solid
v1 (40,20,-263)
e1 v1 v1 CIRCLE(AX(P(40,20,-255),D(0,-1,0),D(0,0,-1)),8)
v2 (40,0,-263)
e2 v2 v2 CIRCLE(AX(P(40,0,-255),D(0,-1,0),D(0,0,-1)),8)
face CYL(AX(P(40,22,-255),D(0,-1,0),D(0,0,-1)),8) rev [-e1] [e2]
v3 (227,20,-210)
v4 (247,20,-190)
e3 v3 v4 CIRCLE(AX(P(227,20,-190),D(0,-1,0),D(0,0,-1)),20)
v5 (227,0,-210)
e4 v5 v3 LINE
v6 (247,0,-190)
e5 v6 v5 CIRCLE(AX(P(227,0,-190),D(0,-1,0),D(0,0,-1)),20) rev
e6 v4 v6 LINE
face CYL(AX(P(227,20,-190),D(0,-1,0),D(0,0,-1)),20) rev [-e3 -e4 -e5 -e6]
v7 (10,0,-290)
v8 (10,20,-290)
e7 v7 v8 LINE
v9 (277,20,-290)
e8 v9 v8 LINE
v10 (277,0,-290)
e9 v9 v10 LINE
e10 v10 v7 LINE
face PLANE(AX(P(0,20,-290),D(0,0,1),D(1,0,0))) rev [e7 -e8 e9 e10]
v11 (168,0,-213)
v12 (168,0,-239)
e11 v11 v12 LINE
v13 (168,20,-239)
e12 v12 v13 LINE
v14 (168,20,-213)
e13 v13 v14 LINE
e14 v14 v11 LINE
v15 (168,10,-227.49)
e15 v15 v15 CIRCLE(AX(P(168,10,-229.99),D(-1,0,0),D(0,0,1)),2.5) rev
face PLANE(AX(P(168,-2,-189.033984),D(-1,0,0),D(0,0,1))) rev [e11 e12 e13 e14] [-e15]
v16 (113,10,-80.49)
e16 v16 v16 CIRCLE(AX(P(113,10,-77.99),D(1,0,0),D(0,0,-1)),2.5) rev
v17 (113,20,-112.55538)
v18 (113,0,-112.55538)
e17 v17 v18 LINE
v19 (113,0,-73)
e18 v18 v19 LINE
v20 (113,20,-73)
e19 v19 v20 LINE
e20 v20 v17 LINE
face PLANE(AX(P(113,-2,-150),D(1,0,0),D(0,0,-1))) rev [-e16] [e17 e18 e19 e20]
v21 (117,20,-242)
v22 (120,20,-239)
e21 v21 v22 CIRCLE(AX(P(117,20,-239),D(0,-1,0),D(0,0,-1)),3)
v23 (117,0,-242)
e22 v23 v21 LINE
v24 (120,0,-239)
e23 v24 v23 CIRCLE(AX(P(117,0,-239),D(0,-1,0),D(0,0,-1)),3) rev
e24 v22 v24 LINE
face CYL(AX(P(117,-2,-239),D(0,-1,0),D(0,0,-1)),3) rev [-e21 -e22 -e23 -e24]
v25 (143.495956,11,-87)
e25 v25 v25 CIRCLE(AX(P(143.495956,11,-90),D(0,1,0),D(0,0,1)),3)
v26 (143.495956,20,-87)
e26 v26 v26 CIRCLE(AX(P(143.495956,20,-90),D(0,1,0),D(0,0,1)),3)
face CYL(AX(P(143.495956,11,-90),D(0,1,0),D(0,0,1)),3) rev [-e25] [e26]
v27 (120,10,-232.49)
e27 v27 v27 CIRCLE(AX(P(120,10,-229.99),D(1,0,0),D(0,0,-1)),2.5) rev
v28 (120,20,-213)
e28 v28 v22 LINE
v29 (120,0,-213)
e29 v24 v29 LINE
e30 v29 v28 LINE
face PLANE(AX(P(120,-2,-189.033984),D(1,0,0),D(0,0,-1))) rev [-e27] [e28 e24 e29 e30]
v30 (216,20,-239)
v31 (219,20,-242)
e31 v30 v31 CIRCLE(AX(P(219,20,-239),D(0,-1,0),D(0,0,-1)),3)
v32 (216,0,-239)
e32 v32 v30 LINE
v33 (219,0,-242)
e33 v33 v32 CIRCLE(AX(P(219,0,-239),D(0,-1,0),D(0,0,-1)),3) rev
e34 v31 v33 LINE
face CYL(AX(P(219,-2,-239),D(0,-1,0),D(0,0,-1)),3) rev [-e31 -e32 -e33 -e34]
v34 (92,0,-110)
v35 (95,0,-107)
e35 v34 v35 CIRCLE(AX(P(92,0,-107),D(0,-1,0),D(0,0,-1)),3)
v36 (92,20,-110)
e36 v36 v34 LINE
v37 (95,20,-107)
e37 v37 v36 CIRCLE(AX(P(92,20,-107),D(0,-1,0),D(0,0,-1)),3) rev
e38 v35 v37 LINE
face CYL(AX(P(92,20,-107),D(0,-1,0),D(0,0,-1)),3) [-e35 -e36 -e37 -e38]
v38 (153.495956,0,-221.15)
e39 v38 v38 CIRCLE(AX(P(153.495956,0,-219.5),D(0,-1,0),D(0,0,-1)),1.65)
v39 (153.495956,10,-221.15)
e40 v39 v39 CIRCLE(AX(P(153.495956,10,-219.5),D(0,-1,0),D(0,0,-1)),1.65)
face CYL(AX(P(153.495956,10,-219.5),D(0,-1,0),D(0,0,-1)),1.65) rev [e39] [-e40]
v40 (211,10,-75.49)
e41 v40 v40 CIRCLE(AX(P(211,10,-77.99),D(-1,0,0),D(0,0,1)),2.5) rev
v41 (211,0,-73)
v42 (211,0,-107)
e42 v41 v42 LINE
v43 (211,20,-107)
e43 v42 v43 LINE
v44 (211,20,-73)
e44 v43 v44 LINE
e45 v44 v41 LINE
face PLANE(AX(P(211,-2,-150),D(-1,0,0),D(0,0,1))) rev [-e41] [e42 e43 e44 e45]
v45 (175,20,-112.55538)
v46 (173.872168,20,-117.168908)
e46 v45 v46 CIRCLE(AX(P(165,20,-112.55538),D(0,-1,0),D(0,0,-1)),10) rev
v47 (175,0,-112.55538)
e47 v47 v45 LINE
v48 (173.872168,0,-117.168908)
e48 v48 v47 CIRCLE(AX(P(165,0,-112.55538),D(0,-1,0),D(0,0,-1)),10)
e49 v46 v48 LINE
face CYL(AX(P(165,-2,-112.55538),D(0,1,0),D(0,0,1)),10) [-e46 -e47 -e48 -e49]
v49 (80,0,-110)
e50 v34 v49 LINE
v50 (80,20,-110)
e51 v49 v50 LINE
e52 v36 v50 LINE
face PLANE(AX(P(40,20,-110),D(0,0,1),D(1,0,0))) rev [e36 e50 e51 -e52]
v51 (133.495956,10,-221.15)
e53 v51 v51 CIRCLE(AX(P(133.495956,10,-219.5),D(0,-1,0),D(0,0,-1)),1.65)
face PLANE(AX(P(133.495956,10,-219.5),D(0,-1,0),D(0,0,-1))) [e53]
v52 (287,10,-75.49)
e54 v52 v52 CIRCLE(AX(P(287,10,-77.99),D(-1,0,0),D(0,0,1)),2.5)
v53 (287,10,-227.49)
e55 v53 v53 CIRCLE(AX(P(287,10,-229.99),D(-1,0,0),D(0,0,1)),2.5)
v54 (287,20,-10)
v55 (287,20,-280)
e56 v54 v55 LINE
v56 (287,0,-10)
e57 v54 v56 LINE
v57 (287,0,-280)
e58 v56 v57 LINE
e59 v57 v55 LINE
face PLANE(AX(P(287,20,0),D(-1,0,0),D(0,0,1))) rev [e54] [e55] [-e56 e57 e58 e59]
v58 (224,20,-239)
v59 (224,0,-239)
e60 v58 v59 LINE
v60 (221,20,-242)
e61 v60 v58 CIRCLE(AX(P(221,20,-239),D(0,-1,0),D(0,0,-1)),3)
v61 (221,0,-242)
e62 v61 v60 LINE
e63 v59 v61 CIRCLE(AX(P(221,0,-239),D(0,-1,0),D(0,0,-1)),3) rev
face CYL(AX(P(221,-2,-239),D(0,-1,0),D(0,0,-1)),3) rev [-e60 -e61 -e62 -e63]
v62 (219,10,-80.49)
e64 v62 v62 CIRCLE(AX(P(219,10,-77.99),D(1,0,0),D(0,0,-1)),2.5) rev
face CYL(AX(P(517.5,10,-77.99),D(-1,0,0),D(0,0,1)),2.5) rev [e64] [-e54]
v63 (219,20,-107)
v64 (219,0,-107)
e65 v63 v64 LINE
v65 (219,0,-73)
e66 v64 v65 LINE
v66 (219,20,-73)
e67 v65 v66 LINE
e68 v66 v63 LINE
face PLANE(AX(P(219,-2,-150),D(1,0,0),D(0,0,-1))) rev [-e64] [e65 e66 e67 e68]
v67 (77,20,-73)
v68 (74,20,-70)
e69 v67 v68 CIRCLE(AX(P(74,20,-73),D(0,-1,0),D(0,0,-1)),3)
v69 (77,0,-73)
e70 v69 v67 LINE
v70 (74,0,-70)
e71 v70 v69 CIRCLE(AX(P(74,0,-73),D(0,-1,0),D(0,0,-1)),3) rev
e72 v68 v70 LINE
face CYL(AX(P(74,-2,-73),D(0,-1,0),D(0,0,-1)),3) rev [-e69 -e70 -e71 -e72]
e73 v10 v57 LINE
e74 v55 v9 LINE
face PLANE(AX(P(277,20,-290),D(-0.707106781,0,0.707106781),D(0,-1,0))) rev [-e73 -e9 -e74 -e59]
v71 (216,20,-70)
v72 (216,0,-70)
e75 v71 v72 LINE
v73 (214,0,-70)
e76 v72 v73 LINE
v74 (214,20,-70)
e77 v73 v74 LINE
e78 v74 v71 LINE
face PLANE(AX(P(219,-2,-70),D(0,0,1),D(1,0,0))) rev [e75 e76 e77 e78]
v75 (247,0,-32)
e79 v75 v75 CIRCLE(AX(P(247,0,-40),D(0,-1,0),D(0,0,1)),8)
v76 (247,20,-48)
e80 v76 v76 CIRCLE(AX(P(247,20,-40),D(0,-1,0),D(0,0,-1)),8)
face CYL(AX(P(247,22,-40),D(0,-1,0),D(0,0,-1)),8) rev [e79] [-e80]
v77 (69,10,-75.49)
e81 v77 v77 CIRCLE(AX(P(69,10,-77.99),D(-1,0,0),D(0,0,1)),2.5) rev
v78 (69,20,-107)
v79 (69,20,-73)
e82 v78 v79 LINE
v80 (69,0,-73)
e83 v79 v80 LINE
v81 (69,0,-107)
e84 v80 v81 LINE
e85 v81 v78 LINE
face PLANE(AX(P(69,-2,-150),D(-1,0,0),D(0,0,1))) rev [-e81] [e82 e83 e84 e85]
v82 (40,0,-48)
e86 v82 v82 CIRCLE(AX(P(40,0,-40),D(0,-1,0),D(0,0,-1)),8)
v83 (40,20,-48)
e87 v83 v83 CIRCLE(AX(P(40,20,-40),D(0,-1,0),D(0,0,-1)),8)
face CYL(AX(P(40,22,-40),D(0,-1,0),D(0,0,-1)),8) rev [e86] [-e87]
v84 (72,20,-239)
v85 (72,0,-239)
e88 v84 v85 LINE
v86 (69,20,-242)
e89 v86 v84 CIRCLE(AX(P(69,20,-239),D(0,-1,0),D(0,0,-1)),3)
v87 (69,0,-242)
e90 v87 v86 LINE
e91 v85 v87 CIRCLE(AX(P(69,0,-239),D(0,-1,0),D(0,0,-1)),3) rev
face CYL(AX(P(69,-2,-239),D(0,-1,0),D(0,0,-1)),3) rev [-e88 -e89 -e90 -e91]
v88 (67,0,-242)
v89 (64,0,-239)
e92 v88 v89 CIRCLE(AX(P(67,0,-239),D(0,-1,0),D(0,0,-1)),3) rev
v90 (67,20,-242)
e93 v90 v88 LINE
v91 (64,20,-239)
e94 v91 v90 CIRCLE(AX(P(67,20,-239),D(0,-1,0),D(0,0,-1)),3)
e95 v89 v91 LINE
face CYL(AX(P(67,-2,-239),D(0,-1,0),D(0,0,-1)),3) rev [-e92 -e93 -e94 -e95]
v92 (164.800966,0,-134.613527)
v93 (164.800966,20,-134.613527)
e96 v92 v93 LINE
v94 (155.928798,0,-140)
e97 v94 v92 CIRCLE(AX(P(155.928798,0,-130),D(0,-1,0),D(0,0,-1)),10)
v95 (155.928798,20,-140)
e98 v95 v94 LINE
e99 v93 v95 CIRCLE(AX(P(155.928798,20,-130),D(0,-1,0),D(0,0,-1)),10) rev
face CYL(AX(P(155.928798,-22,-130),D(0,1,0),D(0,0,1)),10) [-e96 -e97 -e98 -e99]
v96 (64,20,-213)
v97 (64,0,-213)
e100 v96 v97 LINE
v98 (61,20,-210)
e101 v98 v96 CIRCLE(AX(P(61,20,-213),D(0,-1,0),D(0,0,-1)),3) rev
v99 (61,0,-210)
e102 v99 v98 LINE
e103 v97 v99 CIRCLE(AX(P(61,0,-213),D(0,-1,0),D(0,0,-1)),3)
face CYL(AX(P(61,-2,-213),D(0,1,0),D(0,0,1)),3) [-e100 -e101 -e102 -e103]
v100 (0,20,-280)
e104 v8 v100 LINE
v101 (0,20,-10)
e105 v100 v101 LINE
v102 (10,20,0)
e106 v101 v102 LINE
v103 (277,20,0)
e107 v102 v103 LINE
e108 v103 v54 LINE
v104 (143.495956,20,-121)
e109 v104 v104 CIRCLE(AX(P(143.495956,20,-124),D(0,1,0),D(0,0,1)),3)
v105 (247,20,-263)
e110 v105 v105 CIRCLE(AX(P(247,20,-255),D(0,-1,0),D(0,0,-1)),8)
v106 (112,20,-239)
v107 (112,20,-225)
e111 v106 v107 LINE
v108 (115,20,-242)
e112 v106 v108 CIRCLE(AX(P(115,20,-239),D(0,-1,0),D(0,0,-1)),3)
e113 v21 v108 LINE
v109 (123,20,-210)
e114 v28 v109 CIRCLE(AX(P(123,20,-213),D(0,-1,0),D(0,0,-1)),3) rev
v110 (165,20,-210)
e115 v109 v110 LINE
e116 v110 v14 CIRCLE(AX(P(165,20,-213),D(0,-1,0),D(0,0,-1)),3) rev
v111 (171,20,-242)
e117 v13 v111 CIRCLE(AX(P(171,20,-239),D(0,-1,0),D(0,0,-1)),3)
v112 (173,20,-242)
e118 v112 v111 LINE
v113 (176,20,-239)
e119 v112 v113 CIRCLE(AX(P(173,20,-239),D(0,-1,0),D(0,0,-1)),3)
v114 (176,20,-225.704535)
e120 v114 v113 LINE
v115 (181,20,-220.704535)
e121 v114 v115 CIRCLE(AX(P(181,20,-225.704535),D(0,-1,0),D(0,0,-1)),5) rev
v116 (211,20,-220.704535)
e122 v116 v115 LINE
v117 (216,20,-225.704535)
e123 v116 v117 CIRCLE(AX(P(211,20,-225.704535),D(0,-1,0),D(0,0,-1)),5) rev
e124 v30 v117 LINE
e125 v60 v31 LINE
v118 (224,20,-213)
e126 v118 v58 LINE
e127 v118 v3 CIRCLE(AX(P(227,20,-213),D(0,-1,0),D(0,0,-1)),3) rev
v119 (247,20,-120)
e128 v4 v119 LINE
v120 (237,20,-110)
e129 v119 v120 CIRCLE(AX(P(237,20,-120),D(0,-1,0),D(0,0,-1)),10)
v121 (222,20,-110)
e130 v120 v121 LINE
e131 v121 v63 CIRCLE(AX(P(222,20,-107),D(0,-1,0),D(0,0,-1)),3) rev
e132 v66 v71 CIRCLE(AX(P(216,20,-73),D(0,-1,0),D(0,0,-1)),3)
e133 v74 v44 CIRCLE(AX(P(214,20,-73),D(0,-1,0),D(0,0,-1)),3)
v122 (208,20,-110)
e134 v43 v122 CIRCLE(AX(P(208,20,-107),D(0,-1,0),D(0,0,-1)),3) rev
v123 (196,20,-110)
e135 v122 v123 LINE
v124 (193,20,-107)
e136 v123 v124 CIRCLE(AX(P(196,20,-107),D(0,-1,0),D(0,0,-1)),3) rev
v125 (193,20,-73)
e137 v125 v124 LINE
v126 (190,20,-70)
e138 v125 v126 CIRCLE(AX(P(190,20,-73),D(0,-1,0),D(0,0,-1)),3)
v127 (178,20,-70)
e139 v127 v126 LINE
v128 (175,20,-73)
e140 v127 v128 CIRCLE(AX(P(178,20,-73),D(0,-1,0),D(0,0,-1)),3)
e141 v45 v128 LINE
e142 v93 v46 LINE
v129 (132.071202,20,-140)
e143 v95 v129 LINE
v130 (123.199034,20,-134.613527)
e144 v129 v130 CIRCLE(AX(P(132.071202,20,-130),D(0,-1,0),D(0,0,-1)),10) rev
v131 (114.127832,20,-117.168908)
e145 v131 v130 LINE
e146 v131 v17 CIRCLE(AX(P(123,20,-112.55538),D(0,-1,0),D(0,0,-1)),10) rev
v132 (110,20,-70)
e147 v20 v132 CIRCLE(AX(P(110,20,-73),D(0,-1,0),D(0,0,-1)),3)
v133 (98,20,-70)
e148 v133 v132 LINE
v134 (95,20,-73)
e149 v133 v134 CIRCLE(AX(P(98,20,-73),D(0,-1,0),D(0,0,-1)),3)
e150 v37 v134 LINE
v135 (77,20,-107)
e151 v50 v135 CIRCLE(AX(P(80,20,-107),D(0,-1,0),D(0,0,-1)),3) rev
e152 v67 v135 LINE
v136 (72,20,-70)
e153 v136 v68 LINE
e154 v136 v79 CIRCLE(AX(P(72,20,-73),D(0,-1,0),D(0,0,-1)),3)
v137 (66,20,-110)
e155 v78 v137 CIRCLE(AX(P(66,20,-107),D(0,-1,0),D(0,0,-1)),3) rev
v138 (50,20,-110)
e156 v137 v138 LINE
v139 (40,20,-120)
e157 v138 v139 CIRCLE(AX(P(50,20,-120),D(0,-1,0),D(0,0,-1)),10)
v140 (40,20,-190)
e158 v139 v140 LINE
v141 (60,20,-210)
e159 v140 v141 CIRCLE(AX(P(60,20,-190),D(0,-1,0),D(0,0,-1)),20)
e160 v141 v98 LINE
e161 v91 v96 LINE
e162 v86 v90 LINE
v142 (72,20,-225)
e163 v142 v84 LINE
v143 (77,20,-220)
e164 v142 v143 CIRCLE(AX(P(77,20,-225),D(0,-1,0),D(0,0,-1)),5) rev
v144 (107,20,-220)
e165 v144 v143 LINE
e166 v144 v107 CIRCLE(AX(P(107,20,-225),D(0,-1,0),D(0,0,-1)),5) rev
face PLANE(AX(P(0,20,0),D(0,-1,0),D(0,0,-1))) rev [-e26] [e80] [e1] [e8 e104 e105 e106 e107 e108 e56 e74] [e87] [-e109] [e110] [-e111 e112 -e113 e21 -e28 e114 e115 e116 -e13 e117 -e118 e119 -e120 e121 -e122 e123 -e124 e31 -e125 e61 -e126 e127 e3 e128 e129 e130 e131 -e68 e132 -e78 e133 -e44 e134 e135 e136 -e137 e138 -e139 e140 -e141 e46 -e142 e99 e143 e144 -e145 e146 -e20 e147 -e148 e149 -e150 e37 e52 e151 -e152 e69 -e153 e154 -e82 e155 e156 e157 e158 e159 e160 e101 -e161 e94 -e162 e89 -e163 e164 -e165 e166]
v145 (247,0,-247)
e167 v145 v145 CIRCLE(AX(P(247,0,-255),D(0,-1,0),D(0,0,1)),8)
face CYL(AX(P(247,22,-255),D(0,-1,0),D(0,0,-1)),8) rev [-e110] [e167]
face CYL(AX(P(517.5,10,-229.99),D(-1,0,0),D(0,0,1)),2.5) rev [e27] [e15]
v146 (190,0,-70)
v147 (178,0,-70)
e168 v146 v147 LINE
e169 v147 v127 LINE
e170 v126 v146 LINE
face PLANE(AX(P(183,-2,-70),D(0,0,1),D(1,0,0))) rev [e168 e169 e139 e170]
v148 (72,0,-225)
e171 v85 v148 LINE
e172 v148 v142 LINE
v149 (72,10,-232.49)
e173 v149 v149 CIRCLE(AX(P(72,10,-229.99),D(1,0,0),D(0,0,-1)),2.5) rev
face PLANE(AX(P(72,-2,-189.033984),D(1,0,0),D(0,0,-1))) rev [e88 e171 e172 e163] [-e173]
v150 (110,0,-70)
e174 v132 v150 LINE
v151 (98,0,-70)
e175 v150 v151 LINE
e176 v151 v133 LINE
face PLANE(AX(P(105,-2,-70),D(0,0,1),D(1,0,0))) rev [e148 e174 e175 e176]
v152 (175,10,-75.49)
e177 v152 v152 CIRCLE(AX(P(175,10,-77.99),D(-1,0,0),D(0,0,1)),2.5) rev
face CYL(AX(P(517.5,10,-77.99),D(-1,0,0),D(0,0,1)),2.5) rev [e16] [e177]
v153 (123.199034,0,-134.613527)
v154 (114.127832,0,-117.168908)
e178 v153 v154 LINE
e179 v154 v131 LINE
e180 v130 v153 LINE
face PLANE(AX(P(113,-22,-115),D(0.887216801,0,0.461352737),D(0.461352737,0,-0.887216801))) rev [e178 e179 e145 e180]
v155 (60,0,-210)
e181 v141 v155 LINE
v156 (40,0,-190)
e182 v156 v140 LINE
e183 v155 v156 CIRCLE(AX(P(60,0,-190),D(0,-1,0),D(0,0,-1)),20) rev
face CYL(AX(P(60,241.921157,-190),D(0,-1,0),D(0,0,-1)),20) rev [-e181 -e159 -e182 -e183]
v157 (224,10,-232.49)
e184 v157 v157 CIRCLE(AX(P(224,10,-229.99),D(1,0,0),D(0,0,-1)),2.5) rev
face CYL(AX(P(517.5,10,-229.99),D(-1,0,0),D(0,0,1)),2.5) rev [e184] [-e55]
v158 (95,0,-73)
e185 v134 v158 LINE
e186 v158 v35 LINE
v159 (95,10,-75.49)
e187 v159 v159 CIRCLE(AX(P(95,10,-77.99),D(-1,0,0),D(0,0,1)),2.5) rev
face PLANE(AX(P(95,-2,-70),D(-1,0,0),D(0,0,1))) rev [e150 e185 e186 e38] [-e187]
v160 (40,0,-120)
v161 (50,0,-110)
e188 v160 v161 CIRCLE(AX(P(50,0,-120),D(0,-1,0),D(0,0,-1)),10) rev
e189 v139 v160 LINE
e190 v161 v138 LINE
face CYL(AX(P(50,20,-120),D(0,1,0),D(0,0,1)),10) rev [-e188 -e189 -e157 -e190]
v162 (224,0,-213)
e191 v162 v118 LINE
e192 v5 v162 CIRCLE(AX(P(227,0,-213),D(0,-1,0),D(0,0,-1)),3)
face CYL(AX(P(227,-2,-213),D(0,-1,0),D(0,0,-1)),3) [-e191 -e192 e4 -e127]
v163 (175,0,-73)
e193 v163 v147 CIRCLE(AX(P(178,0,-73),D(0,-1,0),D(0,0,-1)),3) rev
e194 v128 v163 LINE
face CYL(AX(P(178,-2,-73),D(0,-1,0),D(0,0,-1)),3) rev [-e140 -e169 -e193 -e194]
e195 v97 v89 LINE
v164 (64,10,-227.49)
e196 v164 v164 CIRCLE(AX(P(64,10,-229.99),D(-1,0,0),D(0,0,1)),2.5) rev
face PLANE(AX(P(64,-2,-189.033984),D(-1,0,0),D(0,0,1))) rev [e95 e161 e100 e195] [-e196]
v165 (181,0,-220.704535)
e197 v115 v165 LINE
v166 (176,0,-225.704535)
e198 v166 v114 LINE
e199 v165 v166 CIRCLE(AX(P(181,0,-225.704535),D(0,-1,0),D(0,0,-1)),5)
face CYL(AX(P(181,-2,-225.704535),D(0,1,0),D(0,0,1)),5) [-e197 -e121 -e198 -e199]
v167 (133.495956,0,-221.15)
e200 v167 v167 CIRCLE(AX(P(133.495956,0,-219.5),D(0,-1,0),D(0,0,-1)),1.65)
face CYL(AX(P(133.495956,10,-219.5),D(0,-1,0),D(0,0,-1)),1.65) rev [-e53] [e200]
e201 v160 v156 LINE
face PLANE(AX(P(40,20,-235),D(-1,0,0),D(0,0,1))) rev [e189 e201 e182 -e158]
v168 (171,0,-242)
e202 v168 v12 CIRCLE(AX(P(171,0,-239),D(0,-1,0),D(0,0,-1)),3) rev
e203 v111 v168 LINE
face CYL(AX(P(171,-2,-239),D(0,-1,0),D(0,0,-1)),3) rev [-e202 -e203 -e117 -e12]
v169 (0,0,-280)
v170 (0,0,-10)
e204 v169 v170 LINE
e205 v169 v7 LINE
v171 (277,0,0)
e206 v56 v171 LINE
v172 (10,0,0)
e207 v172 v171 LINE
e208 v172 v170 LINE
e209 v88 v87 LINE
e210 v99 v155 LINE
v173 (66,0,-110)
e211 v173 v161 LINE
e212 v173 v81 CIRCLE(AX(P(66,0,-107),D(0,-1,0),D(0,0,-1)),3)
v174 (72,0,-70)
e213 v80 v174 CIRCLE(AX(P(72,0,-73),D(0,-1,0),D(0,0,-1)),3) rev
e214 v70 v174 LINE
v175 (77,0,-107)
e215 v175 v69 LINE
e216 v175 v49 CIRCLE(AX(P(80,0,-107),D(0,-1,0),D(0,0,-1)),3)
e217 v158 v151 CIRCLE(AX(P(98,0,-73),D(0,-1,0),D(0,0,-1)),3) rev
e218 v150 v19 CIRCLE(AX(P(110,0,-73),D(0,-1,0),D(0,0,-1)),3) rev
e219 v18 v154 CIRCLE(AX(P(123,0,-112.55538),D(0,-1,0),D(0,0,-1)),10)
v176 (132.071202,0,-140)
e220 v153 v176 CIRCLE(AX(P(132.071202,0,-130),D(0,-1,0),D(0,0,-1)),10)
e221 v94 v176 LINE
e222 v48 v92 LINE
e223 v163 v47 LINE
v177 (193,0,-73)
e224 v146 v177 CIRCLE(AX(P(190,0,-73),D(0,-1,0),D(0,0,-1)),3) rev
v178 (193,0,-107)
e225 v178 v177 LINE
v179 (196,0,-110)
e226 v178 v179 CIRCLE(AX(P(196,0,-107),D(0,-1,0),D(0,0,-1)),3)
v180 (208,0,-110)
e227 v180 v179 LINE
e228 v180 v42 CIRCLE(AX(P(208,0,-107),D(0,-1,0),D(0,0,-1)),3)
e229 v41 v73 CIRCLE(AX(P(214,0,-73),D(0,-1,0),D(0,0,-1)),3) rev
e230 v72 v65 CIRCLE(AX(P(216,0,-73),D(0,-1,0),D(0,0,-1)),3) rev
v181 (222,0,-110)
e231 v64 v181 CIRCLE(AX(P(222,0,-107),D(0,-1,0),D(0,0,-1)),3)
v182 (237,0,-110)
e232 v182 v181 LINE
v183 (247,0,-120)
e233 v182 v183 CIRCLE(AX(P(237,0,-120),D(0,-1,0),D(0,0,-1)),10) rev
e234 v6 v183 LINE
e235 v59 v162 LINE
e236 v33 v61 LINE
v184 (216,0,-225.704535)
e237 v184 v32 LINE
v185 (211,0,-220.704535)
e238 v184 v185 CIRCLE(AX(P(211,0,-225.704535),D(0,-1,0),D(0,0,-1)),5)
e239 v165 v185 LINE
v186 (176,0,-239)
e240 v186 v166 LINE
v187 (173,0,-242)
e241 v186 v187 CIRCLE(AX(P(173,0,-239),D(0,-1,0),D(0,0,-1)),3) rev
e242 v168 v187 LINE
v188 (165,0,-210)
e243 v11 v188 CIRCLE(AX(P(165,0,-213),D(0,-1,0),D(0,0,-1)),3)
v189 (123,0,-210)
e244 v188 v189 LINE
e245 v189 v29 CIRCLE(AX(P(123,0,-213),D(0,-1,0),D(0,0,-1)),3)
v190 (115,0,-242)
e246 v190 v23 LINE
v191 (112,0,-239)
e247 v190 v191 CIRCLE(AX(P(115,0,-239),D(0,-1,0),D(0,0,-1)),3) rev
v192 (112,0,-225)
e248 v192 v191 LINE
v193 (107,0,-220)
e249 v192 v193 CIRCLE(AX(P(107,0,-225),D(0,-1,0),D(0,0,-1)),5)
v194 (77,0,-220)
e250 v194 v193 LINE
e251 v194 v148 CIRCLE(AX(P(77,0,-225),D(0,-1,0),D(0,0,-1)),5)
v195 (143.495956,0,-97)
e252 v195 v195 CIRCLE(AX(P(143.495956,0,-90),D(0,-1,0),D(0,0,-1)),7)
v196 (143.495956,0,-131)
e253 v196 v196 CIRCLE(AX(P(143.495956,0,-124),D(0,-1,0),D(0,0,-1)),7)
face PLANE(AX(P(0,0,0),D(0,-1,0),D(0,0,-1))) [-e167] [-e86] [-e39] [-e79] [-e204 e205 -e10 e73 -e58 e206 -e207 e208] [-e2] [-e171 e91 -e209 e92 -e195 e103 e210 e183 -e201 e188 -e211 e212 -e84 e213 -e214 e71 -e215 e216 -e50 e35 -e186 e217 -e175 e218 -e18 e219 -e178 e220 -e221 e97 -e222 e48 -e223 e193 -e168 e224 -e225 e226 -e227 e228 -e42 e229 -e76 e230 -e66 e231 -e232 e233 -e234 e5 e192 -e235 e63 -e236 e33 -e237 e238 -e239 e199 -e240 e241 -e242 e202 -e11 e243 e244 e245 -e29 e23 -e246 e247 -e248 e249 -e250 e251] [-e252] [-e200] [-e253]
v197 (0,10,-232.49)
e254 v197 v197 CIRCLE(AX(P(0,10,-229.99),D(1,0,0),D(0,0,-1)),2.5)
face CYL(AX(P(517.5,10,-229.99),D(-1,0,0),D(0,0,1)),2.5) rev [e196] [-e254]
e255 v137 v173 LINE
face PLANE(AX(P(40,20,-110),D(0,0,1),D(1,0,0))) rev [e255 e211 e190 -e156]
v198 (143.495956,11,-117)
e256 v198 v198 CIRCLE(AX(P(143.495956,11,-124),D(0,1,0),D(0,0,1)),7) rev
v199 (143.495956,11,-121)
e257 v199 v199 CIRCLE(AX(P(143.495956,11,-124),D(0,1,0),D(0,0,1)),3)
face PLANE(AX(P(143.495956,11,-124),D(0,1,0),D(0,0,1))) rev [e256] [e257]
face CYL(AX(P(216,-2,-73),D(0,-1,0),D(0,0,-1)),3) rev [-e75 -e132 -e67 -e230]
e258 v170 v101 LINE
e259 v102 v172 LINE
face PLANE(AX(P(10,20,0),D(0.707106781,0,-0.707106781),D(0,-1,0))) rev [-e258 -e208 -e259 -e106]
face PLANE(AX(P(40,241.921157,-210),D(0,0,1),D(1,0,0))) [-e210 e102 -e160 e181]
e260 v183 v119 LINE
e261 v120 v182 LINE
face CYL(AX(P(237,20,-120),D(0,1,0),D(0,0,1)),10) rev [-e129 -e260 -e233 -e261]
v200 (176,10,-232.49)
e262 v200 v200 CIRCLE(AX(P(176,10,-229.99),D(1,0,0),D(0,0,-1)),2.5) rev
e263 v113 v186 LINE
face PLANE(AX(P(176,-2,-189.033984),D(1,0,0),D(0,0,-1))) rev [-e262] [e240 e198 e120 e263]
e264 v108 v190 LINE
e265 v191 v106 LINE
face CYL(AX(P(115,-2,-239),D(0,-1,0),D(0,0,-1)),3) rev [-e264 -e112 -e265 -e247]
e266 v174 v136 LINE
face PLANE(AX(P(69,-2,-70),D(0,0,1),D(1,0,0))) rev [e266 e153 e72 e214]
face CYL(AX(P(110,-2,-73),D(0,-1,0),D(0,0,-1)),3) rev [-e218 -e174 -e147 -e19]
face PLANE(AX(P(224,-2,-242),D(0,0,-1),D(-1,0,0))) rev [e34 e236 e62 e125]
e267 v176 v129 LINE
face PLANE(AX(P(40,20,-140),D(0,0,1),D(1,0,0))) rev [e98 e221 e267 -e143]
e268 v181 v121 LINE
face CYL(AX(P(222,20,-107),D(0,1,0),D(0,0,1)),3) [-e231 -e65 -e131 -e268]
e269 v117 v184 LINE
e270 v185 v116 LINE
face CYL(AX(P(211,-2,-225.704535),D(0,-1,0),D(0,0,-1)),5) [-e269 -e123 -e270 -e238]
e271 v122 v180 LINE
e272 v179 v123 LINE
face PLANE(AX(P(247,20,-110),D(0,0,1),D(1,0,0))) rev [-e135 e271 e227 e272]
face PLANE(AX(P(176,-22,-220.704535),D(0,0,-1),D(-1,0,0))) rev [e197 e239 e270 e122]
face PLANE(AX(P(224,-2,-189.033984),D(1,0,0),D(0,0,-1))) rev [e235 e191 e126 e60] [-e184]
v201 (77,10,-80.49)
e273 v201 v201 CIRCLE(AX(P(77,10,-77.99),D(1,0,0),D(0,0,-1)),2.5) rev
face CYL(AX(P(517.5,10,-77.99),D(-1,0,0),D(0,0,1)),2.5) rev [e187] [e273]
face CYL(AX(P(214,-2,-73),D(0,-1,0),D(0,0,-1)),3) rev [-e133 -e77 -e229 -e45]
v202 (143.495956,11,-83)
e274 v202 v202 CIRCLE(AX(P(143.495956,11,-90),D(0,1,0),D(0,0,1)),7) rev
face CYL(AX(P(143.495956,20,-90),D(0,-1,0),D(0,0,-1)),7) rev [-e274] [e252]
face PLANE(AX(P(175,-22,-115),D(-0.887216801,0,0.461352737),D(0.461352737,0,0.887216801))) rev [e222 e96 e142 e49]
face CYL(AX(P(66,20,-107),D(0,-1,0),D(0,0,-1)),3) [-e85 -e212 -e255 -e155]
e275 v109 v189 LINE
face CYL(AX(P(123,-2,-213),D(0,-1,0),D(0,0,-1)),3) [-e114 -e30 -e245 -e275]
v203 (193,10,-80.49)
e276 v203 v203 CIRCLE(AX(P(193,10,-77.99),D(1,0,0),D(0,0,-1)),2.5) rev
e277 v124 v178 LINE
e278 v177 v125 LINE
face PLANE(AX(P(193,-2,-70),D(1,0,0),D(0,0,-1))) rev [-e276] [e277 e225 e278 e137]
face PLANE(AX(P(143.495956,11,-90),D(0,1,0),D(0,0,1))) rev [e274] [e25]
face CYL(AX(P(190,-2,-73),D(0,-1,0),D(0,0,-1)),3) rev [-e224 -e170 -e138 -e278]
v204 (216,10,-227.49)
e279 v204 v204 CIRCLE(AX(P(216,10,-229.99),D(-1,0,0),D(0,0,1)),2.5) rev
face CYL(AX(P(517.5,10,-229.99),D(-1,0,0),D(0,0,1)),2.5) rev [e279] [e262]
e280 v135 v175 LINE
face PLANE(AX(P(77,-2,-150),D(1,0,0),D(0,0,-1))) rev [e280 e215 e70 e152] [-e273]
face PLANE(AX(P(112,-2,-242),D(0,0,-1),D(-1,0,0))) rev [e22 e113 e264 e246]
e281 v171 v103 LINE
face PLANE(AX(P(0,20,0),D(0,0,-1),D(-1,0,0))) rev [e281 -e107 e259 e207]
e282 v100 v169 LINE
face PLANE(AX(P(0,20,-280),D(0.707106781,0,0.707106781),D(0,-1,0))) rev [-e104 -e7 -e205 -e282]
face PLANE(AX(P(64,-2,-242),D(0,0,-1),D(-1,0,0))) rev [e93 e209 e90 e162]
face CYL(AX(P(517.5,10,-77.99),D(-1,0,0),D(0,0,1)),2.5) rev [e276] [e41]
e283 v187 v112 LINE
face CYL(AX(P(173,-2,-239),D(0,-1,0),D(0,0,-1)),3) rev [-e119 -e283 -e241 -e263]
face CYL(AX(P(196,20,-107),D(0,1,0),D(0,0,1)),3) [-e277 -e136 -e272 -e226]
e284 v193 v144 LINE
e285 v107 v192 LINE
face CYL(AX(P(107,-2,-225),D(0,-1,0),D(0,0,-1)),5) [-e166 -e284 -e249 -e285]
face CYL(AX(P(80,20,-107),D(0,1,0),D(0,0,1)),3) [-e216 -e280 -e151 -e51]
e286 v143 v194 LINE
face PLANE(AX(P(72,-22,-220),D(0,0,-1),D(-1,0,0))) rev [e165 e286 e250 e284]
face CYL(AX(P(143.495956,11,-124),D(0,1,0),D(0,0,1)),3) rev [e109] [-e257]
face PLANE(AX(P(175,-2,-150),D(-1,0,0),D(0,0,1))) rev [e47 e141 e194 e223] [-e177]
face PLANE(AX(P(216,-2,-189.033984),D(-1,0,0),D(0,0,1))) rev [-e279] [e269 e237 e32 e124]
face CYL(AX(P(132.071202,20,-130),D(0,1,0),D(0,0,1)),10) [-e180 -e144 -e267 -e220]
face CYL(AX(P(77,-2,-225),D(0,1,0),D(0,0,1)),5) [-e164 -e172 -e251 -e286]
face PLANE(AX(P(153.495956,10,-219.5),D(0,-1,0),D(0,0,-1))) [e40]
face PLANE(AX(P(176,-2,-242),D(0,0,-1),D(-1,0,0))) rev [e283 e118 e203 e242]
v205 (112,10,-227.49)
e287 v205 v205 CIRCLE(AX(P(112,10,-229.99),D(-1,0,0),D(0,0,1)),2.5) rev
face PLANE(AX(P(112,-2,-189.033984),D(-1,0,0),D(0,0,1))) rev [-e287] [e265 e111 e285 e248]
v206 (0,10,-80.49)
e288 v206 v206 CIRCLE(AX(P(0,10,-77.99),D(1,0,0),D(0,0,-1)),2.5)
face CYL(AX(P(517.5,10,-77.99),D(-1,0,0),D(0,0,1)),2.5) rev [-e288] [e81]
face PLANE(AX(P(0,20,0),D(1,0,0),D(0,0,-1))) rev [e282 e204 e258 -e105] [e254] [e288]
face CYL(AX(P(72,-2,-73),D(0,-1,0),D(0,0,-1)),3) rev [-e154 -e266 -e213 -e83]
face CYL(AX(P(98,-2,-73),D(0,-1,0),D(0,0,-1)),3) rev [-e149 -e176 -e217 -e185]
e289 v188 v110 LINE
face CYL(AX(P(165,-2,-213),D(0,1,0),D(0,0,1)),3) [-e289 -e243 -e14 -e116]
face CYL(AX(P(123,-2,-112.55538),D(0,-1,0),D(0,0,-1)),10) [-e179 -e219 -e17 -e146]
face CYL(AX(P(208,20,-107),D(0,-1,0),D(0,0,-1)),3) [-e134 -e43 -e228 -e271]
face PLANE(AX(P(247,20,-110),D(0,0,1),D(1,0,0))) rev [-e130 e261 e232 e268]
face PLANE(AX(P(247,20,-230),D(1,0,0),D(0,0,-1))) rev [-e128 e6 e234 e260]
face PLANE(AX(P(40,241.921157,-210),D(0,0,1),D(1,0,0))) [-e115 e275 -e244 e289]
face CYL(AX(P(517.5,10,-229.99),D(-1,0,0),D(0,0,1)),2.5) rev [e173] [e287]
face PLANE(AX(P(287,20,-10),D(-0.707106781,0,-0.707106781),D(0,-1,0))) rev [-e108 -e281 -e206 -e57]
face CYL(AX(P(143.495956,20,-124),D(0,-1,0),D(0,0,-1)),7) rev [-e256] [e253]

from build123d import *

# Parameters (mm, degrees)
FILLET1_OUTLINE_R     = 8
FILLET1_OUTLINE_R_2   = 7
FILLET1_OUTLINE_R_3   = 1.65
FILLET1_DEPTH         = 20
FILLET1_START         = 11
FILLET1_2_OUTLINE_R   = 7
FILLET1_2_OUTLINE_R_2 = 3
FILLET1_2_OUTLINE_R_3 = 1.65
FILLET1_2_DEPTH       = 9
FILLET1_START_2       = 10
FILLET1_3_OUTLINE_R   = 1.65
FILLET1_3_DEPTH       = 1
FILLET1_START_3       = -1
FILLET1_4_OUTLINE_R   = 2.5
FILLET1_4_DEPTH       = 289
CUT_EXTRUDE1_DEPTH    = 42
FILLET2_R             = 10
SKETCH2_W             = 42.909643268
SKETCH2_H             = 22.925607662
SKETCH2_W_2           = 43.116379367
SKETCH2_H_2           = 35.117017069
CUT_EXTRUDE2_DEPTH    = 42
FILLET3_R             = 5


with BuildPart() as part:
    # Fillet1: read off the stored shape, not the designer's step
    # Fillet1 outline → Fillet1 (new body)
    with BuildSketch(Plane(origin=(0, 0, 0), x_dir=(1, 0, 0), z_dir=(0, 1, 0))):
        Polygon((0, 280), (0, 10), (10, 0), (277, 0), (287, 10), (287, 280), (277, 290), (10, 290), align=None)
        with Locations((40, 40)):
            Circle(FILLET1_OUTLINE_R, mode=Mode.SUBTRACT)
        with Locations((143.495955763, 90)):
            Circle(FILLET1_OUTLINE_R_2, mode=Mode.SUBTRACT)
        with Locations((143.495955763, 124)):
            Circle(FILLET1_OUTLINE_R_2, mode=Mode.SUBTRACT)
        with Locations((247, 40)):
            Circle(FILLET1_OUTLINE_R, mode=Mode.SUBTRACT)
        with Locations((40, 255)):
            Circle(FILLET1_OUTLINE_R, mode=Mode.SUBTRACT)
        with Locations((133.495955763, 219.5)):
            Circle(FILLET1_OUTLINE_R_3, mode=Mode.SUBTRACT)
        with BuildLine():
            Line((237, 110), (222, 110))
            ThreePointArc((222, 110), (219.878679656, 109.121320344), (219, 107))
            Line((219, 107), (219, 73))
            ThreePointArc((219, 73), (218.121320344, 70.878679656), (216, 70))
            Line((216, 70), (214, 70))
            ThreePointArc((214, 70), (211.878679656, 70.878679656), (211, 73))
            Line((211, 73), (211, 107))
            ThreePointArc((211, 107), (210.121320344, 109.121320344), (208, 110))
            Line((208, 110), (196, 110))
            ThreePointArc((196, 110), (193.878679656, 109.121320344), (193, 107))
            Line((193, 107), (193, 73))
            ThreePointArc((193, 73), (192.121320344, 70.878679656), (190, 70))
            Line((190, 70), (178, 70))
            ThreePointArc((178, 70), (175.878679656, 70.878679656), (175, 73))
            Line((175, 73), (175, 137))
            ThreePointArc((175, 137), (174.121320344, 139.121320344), (172, 140))
            Line((172, 140), (116, 140))
            ThreePointArc((116, 140), (113.878679656, 139.121320344), (113, 137))
            Line((113, 137), (113, 73))
            ThreePointArc((113, 73), (112.121320344, 70.878679656), (110, 70))
            Line((110, 70), (98, 70))
            ThreePointArc((98, 70), (95.878679656, 70.878679656), (95, 73))
            Line((95, 73), (95, 107))
            ThreePointArc((95, 107), (94.121320344, 109.121320344), (92, 110))
            Line((92, 110), (80, 110))
            ThreePointArc((80, 110), (77.878679656, 109.121320344), (77, 107))
            Line((77, 107), (77, 73))
            ThreePointArc((77, 73), (76.121320344, 70.878679656), (74, 70))
            Line((74, 70), (72, 70))
            ThreePointArc((72, 70), (69.878679656, 70.878679656), (69, 73))
            Line((69, 73), (69, 107))
            ThreePointArc((69, 107), (68.121320344, 109.121320344), (66, 110))
            Line((66, 110), (50, 110))
            ThreePointArc((50, 110), (42.928932188, 112.928932188), (40, 120))
            Line((40, 120), (40, 190))
            ThreePointArc((40, 190), (45.857864376, 204.142135624), (60, 210))
            Line((60, 210), (61, 210))
            ThreePointArc((61, 210), (63.121320344, 210.878679656), (64, 213))
            Line((64, 213), (64, 239))
            ThreePointArc((64, 239), (64.878679656, 241.121320344), (67, 242))
            Line((67, 242), (69, 242))
            ThreePointArc((69, 242), (71.121320344, 241.121320344), (72, 239))
            Line((72, 239), (72, 213))
            ThreePointArc((72, 213), (72.878679656, 210.878679656), (75, 210))
            Line((75, 210), (109, 210))
            ThreePointArc((109, 210), (111.121320344, 210.878679656), (112, 213))
            Line((112, 213), (112, 239))
            ThreePointArc((112, 239), (112.878679656, 241.121320344), (115, 242))
            Line((115, 242), (117, 242))
            ThreePointArc((117, 242), (119.121320344, 241.121320344), (120, 239))
            Line((120, 239), (120, 213))
            ThreePointArc((120, 213), (120.878679656, 210.878679656), (123, 210))
            Line((123, 210), (165, 210))
            ThreePointArc((165, 210), (167.121320344, 210.878679656), (168, 213))
            Line((168, 213), (168, 239))
            ThreePointArc((168, 239), (168.878679656, 241.121320344), (171, 242))
            Line((171, 242), (173, 242))
            ThreePointArc((173, 242), (175.121320344, 241.121320344), (176, 239))
            Line((176, 239), (176, 213))
            ThreePointArc((176, 213), (176.878679656, 210.878679656), (179, 210))
            Line((179, 210), (213, 210))
            ThreePointArc((213, 210), (215.121320344, 210.878679656), (216, 213))
            Line((216, 213), (216, 239))
            ThreePointArc((216, 239), (216.878679656, 241.121320344), (219, 242))
            Line((219, 242), (221, 242))
            ThreePointArc((221, 242), (223.121320344, 241.121320344), (224, 239))
            Line((224, 239), (224, 213))
            ThreePointArc((224, 213), (224.878679656, 210.878679656), (227, 210))
            ThreePointArc((227, 210), (241.142135624, 204.142135624), (247, 190))
            Line((247, 190), (247, 120))
            ThreePointArc((247, 120), (244.071067812, 112.928932188), (237, 110))
        make_face(mode=Mode.SUBTRACT)
        with Locations((153.495955763, 219.5)):
            Circle(FILLET1_OUTLINE_R_3, mode=Mode.SUBTRACT)
        with Locations((247, 255)):
            Circle(FILLET1_OUTLINE_R, mode=Mode.SUBTRACT)
    extrude(amount=FILLET1_DEPTH)

    # Fillet1 2 outline → Fillet1 2 (add)
    # profile 1 of 4: a face of its own
    with BuildSketch(Plane(origin=(0, 0, 0), x_dir=(1, 0, 0), z_dir=(0, 1, 0)).offset(FILLET1_START)):
        with Locations((143.495955763, 90)):
            Circle(FILLET1_2_OUTLINE_R)
        with Locations((143.495955763, 90)):
            Circle(FILLET1_2_OUTLINE_R_2, mode=Mode.SUBTRACT)
    # profile 2 of 4: a face of its own
    with BuildSketch(Plane(origin=(0, 0, 0), x_dir=(1, 0, 0), z_dir=(0, 1, 0)).offset(FILLET1_START)):
        with Locations((143.495955763, 124)):
            Circle(FILLET1_2_OUTLINE_R)
        with Locations((143.495955763, 124)):
            Circle(FILLET1_2_OUTLINE_R_2, mode=Mode.SUBTRACT)
    # profile 3 of 4: a face of its own
    with BuildSketch(Plane(origin=(0, 0, 0), x_dir=(1, 0, 0), z_dir=(0, 1, 0)).offset(FILLET1_START)):
        with Locations((153.495955763, 219.5)):
            Circle(FILLET1_2_OUTLINE_R_3)
    # profile 4 of 4: a face of its own
    with BuildSketch(Plane(origin=(0, 0, 0), x_dir=(1, 0, 0), z_dir=(0, 1, 0)).offset(FILLET1_START)):
        with Locations((133.495955763, 219.5)):
            Circle(FILLET1_2_OUTLINE_R_3)
    extrude(amount=FILLET1_2_DEPTH)

    # Fillet1 3 outline → Fillet1 3 (add)
    with BuildSketch(Plane(origin=(0, 0, 0), x_dir=(1, 0, 0), z_dir=(0, 1, 0)).offset(FILLET1_START_2)):
        with Locations((153.495955763, 219.5)):
            Circle(FILLET1_3_OUTLINE_R)
        with Locations((133.495955763, 219.5)):
            Circle(FILLET1_3_OUTLINE_R)
    extrude(amount=FILLET1_3_DEPTH)

    # Fillet1 4 outline → Fillet1 4 (cut)
    with BuildSketch(Plane.YZ.offset(FILLET1_START_3)):
        with Locations((10, -77.99)):
            Circle(FILLET1_4_OUTLINE_R)
        with Locations((10, -229.99)):
            Circle(FILLET1_4_OUTLINE_R)
    extrude(amount=FILLET1_4_DEPTH, mode=Mode.SUBTRACT)

    # Sketch1 → Cut-Extrude1 (cut)
    with BuildSketch(Plane(origin=(0, 20, 0), x_dir=(1, 0, 0), z_dir=(0, 1, 0))):
        Polygon((113, 115), (126, 140), (126, 142.938588866), (102.686400204, 142.938588866), (102.686400204, 115), align=None)
        Polygon((175, 115), (162, 140), (162, 142.938588866), (181.775389982, 142.938588866), (181.775389982, 115), align=None)
    extrude(amount=-CUT_EXTRUDE1_DEPTH, mode=Mode.SUBTRACT)

    # Fillet2
    fillet2_edges = [part.edges().sort_by_distance(p)[0] for p in [
        (113, 10, -115),
        (175, 10, -115),
        (126, 10, -140),
        (162, 10, -140),
    ]]
    fillet(fillet2_edges, radius=FILLET2_R)

    # Sketch2 → Cut-Extrude2 (cut)
    with BuildSketch(Plane(origin=(0, 20, 0), x_dir=(1, 0, 0), z_dir=(0, 1, 0))):
        with Locations((93.454821634, 208.537196169)):
            Rectangle(SKETCH2_W, SKETCH2_H)
        with Locations((197.558189684, 203.14602613)):
            Rectangle(SKETCH2_W_2, SKETCH2_H_2)
    extrude(amount=-CUT_EXTRUDE2_DEPTH, mode=Mode.SUBTRACT)

    # Fillet3
    fillet3_edges = [part.edges().sort_by_distance(p)[0] for p in [
        (112, 10, -220),
        (72, 10, -220),
        (176, 10, -220.704534665),
        (216, 10, -220.704534665),
    ]]
    fillet(fillet3_edges, radius=FILLET3_R)


solid = part.part
